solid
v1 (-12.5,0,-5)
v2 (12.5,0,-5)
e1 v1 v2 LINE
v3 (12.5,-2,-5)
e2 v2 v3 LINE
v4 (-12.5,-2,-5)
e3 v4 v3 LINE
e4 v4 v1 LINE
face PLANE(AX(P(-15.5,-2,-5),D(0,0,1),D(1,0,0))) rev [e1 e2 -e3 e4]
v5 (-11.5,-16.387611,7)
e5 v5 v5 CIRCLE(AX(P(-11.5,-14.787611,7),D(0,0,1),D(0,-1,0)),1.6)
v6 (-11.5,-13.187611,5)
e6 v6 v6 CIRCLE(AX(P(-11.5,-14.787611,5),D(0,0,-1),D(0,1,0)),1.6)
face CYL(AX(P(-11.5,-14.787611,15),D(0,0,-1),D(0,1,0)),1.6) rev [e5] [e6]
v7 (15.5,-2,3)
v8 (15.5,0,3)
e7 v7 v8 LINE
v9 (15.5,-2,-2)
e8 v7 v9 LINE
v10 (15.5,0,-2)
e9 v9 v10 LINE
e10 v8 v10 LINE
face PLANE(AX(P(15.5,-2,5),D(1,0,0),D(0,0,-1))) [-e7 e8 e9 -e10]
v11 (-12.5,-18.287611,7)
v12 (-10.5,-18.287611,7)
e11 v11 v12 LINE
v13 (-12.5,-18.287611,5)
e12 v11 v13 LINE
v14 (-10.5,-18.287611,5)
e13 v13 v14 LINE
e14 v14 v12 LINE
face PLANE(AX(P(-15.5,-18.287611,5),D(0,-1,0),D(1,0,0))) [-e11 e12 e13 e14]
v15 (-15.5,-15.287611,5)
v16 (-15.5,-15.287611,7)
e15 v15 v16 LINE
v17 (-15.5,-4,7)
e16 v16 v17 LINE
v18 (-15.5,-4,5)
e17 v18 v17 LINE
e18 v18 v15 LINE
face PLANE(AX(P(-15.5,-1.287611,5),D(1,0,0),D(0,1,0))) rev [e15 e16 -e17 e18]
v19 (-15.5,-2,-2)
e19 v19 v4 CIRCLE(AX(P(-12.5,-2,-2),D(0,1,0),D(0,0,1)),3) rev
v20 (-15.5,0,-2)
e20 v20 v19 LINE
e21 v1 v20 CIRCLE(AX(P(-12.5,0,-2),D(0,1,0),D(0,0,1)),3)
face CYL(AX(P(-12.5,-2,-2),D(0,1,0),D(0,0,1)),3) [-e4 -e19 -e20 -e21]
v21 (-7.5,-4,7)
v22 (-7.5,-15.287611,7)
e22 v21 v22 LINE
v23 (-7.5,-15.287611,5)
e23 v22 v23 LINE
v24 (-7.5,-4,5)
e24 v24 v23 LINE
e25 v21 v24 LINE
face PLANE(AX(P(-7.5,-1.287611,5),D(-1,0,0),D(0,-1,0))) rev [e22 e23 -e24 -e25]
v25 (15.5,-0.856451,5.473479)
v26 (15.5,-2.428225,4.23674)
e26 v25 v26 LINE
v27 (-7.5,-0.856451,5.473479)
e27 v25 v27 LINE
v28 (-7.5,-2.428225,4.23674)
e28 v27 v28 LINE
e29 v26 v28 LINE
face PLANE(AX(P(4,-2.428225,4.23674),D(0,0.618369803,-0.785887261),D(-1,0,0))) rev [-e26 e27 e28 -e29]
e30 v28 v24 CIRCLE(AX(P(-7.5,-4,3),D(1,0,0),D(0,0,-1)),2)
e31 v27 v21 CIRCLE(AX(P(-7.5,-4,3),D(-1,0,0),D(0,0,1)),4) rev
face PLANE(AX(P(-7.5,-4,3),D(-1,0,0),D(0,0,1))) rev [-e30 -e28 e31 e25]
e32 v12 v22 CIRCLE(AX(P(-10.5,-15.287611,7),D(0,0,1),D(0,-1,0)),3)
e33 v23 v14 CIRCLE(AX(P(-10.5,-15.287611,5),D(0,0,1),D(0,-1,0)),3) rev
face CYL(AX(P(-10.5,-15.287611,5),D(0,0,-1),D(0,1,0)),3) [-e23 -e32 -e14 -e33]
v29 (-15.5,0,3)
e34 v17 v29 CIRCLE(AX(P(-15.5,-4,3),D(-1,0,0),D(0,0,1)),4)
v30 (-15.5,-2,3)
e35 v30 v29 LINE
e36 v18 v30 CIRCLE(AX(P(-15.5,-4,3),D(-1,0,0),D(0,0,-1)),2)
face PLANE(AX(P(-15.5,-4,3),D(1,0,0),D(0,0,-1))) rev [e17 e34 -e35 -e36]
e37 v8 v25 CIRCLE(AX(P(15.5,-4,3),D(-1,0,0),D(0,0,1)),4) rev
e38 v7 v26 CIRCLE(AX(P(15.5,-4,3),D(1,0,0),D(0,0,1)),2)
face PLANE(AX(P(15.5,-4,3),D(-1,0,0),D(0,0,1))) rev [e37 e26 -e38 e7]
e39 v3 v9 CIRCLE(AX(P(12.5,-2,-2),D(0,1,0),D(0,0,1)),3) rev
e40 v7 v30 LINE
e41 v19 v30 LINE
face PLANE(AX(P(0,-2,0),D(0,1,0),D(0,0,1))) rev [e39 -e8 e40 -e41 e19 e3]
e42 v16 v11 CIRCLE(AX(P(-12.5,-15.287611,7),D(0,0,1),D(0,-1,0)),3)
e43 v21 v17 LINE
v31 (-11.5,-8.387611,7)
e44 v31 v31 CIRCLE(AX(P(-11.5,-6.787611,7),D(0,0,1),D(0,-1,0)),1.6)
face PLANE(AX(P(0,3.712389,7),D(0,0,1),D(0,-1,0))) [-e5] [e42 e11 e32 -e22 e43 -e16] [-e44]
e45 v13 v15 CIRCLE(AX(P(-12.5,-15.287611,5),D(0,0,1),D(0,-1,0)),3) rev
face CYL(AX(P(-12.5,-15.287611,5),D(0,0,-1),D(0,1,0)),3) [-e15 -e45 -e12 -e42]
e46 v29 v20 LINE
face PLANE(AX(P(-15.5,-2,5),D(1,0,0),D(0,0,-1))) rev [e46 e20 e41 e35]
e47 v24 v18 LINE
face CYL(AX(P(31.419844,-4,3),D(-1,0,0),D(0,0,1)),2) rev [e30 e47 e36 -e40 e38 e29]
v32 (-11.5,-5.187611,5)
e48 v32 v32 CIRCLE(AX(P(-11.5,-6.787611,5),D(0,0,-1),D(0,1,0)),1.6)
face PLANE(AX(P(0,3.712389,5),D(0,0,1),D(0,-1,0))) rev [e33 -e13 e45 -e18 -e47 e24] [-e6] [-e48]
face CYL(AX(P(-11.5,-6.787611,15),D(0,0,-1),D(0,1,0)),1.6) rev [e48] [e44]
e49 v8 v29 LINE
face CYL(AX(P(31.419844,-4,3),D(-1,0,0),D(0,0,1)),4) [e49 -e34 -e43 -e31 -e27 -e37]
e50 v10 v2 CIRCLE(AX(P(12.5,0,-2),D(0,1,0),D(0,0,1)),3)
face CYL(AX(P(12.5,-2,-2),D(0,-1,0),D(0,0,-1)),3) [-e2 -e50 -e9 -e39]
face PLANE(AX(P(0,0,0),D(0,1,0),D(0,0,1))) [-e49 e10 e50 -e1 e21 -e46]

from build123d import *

# Parameters (mm, degrees)
SM_BASE_FLANGE_1_DEPTH = 2
SKETCH_8_R             = 1.6
CUT_EXTRUDE_1_DEPTH    = 10
FILLET_1_R             = 3
OTHER_START            = 6.58904
OTHER_1_OUTLINE_W      = 8
OTHER_1_OUTLINE_H      = 2
OTHER_1_DEPTH          = 15.41096
OTHER_START_2          = 5
OTHER_1_2_OUTLINE_R    = 1.6
OTHER_1_2_DEPTH        = 0.473479212
OTHER_START_3          = 6.529597681
OTHER_1_3_OUTLINE_W    = 8
OTHER_1_3_OUTLINE_H    = 2
OTHER_1_3_DEPTH        = 0.059442319
OTHER_START_4          = 3
OTHER_1_4_OUTLINE_R    = 1.6
OTHER_1_4_DEPTH        = 4
OTHER_1_5_OUTLINE_W    = 23
OTHER_1_5_OUTLINE_H    = 2
OTHER_1_5_DEPTH        = 0.46188997
OTHER_START_5          = -15.5
OTHER_1_6_DEPTH        = 31
OTHER_START_6          = -7.5
OTHER_1_7_DEPTH        = 23
OTHER_1_8_DEPTH        = 23


with BuildPart() as part:
    # 基体-法兰1: sheet metal written as solids
    # Sketch 1 → 基体-法兰1 (new body)
    with BuildSketch(Plane(origin=(0, 0, 0), x_dir=(1, 0, 0), z_dir=(0, 1, 0))):
        Polygon((-7.5, -5), (15.5, -5), (15.5, 5), (-15.5, 5), (-15.5, -5), (-15.5, -22), (-7.5, -22), align=None)
    extrude(amount=-SM_BASE_FLANGE_1_DEPTH)

    # 草图8 → 切除-拉伸1 (cut)
    with BuildSketch(Plane.XZ.offset(2)):
        with Locations(Location((-11.5, 18.5, 0), (0, 0, 270))):
            Circle(SKETCH_8_R)
        with Locations(Location((-11.5, 10.5, 0), (0, 0, 270))):
            Circle(SKETCH_8_R)
    extrude(amount=-CUT_EXTRUDE_1_DEPTH, mode=Mode.SUBTRACT)

    # 圆角1
    fillet_1_edges = [part.edges().sort_by_distance(p)[0] for p in [
        (15.5, -1, -5),
        (-15.5, -1, -5),
        (-15.5, -1, 22),
        (-7.5, -1, 22),
    ]]
    fillet(fillet_1_edges, radius=FILLET_1_R)

    # Other 1: read off the stored shape, not the designer's step
    # Other 1 outline → Other 1 (cut)
    with BuildSketch(Plane.XY.offset(OTHER_START)):
        with Locations((-11.5, -1)):
            Rectangle(OTHER_1_OUTLINE_W, OTHER_1_OUTLINE_H)
    extrude(amount=OTHER_1_DEPTH, mode=Mode.SUBTRACT)

    # Other 1 2 outline → Other 1 2 (add)
    with BuildSketch(Plane.XY.offset(OTHER_START_2)):
        with BuildLine():
            Line((-7.5, -15.28761102), (-7.5, -2))
            Line((-7.5, -2), (-15.5, -2))
            Line((-15.5, -2), (-15.5, -15.28761102))
            ThreePointArc((-15.5, -15.28761102), (-14.621320344, -17.408931363), (-12.5, -18.28761102))
            Line((-12.5, -18.28761102), (-10.5, -18.28761102))
            ThreePointArc((-10.5, -18.28761102), (-8.378679656, -17.408931364), (-7.5, -15.28761102))
        make_face()
        with Locations((-11.5, -14.78761102)):
            Circle(OTHER_1_2_OUTLINE_R, mode=Mode.SUBTRACT)
        with Locations((-11.5, -6.78761102)):
            Circle(OTHER_1_2_OUTLINE_R, mode=Mode.SUBTRACT)
    extrude(amount=OTHER_1_2_DEPTH)

    # Other 1 3 outline → Other 1 3 (cut)
    with BuildSketch(Plane.XY.offset(OTHER_START_3)):
        with Locations((-11.5, -1)):
            Rectangle(OTHER_1_3_OUTLINE_W, OTHER_1_3_OUTLINE_H)
    extrude(amount=OTHER_1_3_DEPTH, mode=Mode.SUBTRACT)

    # Other 1 4 outline → Other 1 4 (add)
    with BuildSketch(Plane.XY.offset(OTHER_START_4)):
        with BuildLine():
            Line((-7.5, -15.28761102), (-7.5, -2))
            Line((-7.5, -2), (-15.5, -2))
            Line((-15.5, -2), (-15.5, -15.28761102))
            ThreePointArc((-15.5, -15.28761102), (-14.621320344, -17.408931363), (-12.5, -18.28761102))
            Line((-12.5, -18.28761102), (-10.5, -18.28761102))
            ThreePointArc((-10.5, -18.28761102), (-8.378679656, -17.408931364), (-7.5, -15.28761102))
        make_face()
        with Locations((-11.5, -14.78761102)):
            Circle(OTHER_1_4_OUTLINE_R, mode=Mode.SUBTRACT)
        with Locations((-11.5, -6.78761102)):
            Circle(OTHER_1_4_OUTLINE_R, mode=Mode.SUBTRACT)
    extrude(amount=OTHER_1_4_DEPTH)

    # Other 1 5 outline → Other 1 5 (add)
    with BuildSketch(Plane.XY.offset(OTHER_START_2)):
        with Locations((4, -1)):
            Rectangle(OTHER_1_5_OUTLINE_W, OTHER_1_5_OUTLINE_H)
    extrude(amount=OTHER_1_5_DEPTH)

    # Other 1 6 outline → Other 1 6 (cut)
    with BuildSketch(Plane.YZ.offset(OTHER_START_5)):
        with BuildLine():
            ThreePointArc((-2, 3), (-2.585786438, 4.414213562), (-4, 5))
            Line((-4, 5), (-18.28761102, 5))
            Line((-18.28761102, 5), (-18.28761102, 3))
            Line((-18.28761102, 3), (-2, 3))
        make_face()
        with BuildLine():
            Line((-2, 7), (-4, 7))
            ThreePointArc((-4, 7), (-1.171572875, 5.828427125), (0, 3))
            Line((0, 3), (0, 6.529597681))
            Line((0, 6.529597681), (-2, 6.529597681))
            Line((-2, 6.529597681), (-2, 7))
        make_face()
    extrude(amount=OTHER_1_6_DEPTH, mode=Mode.SUBTRACT)

    # Other 1 7 outline → Other 1 7 (cut)
    with BuildSketch(Plane.YZ.offset(OTHER_START_6)):
        Polygon((-2, 5.46188997), (-2, 4.573685779), (-0.871179745, 5.46188997), align=None)
    extrude(amount=OTHER_1_7_DEPTH, mode=Mode.SUBTRACT)

    # Other 1 8 outline → Other 1 8 (add)
    with BuildSketch(Plane.YZ.offset(OTHER_START_6)):
        with BuildLine():
            Line((-2, 4.573685779), (-2.428225479, 4.236739606))
            ThreePointArc((-2.428225479, 4.236739606), (-2.110086108, 3.654389393), (-2, 3))
            Line((-2, 3), (-2, 4.573685779))
        make_face()
        with BuildLine():
            Line((-0.856450957, 5.473479212), (-0.871179745, 5.46188997))
            Line((-0.871179745, 5.46188997), (-0.847366533, 5.46188997))
            ThreePointArc((-0.847366533, 5.46188997), (-0.851903412, 5.467688772), (-0.856450957, 5.473479212))
        make_face()
    extrude(amount=OTHER_1_8_DEPTH)


solid = part.part
